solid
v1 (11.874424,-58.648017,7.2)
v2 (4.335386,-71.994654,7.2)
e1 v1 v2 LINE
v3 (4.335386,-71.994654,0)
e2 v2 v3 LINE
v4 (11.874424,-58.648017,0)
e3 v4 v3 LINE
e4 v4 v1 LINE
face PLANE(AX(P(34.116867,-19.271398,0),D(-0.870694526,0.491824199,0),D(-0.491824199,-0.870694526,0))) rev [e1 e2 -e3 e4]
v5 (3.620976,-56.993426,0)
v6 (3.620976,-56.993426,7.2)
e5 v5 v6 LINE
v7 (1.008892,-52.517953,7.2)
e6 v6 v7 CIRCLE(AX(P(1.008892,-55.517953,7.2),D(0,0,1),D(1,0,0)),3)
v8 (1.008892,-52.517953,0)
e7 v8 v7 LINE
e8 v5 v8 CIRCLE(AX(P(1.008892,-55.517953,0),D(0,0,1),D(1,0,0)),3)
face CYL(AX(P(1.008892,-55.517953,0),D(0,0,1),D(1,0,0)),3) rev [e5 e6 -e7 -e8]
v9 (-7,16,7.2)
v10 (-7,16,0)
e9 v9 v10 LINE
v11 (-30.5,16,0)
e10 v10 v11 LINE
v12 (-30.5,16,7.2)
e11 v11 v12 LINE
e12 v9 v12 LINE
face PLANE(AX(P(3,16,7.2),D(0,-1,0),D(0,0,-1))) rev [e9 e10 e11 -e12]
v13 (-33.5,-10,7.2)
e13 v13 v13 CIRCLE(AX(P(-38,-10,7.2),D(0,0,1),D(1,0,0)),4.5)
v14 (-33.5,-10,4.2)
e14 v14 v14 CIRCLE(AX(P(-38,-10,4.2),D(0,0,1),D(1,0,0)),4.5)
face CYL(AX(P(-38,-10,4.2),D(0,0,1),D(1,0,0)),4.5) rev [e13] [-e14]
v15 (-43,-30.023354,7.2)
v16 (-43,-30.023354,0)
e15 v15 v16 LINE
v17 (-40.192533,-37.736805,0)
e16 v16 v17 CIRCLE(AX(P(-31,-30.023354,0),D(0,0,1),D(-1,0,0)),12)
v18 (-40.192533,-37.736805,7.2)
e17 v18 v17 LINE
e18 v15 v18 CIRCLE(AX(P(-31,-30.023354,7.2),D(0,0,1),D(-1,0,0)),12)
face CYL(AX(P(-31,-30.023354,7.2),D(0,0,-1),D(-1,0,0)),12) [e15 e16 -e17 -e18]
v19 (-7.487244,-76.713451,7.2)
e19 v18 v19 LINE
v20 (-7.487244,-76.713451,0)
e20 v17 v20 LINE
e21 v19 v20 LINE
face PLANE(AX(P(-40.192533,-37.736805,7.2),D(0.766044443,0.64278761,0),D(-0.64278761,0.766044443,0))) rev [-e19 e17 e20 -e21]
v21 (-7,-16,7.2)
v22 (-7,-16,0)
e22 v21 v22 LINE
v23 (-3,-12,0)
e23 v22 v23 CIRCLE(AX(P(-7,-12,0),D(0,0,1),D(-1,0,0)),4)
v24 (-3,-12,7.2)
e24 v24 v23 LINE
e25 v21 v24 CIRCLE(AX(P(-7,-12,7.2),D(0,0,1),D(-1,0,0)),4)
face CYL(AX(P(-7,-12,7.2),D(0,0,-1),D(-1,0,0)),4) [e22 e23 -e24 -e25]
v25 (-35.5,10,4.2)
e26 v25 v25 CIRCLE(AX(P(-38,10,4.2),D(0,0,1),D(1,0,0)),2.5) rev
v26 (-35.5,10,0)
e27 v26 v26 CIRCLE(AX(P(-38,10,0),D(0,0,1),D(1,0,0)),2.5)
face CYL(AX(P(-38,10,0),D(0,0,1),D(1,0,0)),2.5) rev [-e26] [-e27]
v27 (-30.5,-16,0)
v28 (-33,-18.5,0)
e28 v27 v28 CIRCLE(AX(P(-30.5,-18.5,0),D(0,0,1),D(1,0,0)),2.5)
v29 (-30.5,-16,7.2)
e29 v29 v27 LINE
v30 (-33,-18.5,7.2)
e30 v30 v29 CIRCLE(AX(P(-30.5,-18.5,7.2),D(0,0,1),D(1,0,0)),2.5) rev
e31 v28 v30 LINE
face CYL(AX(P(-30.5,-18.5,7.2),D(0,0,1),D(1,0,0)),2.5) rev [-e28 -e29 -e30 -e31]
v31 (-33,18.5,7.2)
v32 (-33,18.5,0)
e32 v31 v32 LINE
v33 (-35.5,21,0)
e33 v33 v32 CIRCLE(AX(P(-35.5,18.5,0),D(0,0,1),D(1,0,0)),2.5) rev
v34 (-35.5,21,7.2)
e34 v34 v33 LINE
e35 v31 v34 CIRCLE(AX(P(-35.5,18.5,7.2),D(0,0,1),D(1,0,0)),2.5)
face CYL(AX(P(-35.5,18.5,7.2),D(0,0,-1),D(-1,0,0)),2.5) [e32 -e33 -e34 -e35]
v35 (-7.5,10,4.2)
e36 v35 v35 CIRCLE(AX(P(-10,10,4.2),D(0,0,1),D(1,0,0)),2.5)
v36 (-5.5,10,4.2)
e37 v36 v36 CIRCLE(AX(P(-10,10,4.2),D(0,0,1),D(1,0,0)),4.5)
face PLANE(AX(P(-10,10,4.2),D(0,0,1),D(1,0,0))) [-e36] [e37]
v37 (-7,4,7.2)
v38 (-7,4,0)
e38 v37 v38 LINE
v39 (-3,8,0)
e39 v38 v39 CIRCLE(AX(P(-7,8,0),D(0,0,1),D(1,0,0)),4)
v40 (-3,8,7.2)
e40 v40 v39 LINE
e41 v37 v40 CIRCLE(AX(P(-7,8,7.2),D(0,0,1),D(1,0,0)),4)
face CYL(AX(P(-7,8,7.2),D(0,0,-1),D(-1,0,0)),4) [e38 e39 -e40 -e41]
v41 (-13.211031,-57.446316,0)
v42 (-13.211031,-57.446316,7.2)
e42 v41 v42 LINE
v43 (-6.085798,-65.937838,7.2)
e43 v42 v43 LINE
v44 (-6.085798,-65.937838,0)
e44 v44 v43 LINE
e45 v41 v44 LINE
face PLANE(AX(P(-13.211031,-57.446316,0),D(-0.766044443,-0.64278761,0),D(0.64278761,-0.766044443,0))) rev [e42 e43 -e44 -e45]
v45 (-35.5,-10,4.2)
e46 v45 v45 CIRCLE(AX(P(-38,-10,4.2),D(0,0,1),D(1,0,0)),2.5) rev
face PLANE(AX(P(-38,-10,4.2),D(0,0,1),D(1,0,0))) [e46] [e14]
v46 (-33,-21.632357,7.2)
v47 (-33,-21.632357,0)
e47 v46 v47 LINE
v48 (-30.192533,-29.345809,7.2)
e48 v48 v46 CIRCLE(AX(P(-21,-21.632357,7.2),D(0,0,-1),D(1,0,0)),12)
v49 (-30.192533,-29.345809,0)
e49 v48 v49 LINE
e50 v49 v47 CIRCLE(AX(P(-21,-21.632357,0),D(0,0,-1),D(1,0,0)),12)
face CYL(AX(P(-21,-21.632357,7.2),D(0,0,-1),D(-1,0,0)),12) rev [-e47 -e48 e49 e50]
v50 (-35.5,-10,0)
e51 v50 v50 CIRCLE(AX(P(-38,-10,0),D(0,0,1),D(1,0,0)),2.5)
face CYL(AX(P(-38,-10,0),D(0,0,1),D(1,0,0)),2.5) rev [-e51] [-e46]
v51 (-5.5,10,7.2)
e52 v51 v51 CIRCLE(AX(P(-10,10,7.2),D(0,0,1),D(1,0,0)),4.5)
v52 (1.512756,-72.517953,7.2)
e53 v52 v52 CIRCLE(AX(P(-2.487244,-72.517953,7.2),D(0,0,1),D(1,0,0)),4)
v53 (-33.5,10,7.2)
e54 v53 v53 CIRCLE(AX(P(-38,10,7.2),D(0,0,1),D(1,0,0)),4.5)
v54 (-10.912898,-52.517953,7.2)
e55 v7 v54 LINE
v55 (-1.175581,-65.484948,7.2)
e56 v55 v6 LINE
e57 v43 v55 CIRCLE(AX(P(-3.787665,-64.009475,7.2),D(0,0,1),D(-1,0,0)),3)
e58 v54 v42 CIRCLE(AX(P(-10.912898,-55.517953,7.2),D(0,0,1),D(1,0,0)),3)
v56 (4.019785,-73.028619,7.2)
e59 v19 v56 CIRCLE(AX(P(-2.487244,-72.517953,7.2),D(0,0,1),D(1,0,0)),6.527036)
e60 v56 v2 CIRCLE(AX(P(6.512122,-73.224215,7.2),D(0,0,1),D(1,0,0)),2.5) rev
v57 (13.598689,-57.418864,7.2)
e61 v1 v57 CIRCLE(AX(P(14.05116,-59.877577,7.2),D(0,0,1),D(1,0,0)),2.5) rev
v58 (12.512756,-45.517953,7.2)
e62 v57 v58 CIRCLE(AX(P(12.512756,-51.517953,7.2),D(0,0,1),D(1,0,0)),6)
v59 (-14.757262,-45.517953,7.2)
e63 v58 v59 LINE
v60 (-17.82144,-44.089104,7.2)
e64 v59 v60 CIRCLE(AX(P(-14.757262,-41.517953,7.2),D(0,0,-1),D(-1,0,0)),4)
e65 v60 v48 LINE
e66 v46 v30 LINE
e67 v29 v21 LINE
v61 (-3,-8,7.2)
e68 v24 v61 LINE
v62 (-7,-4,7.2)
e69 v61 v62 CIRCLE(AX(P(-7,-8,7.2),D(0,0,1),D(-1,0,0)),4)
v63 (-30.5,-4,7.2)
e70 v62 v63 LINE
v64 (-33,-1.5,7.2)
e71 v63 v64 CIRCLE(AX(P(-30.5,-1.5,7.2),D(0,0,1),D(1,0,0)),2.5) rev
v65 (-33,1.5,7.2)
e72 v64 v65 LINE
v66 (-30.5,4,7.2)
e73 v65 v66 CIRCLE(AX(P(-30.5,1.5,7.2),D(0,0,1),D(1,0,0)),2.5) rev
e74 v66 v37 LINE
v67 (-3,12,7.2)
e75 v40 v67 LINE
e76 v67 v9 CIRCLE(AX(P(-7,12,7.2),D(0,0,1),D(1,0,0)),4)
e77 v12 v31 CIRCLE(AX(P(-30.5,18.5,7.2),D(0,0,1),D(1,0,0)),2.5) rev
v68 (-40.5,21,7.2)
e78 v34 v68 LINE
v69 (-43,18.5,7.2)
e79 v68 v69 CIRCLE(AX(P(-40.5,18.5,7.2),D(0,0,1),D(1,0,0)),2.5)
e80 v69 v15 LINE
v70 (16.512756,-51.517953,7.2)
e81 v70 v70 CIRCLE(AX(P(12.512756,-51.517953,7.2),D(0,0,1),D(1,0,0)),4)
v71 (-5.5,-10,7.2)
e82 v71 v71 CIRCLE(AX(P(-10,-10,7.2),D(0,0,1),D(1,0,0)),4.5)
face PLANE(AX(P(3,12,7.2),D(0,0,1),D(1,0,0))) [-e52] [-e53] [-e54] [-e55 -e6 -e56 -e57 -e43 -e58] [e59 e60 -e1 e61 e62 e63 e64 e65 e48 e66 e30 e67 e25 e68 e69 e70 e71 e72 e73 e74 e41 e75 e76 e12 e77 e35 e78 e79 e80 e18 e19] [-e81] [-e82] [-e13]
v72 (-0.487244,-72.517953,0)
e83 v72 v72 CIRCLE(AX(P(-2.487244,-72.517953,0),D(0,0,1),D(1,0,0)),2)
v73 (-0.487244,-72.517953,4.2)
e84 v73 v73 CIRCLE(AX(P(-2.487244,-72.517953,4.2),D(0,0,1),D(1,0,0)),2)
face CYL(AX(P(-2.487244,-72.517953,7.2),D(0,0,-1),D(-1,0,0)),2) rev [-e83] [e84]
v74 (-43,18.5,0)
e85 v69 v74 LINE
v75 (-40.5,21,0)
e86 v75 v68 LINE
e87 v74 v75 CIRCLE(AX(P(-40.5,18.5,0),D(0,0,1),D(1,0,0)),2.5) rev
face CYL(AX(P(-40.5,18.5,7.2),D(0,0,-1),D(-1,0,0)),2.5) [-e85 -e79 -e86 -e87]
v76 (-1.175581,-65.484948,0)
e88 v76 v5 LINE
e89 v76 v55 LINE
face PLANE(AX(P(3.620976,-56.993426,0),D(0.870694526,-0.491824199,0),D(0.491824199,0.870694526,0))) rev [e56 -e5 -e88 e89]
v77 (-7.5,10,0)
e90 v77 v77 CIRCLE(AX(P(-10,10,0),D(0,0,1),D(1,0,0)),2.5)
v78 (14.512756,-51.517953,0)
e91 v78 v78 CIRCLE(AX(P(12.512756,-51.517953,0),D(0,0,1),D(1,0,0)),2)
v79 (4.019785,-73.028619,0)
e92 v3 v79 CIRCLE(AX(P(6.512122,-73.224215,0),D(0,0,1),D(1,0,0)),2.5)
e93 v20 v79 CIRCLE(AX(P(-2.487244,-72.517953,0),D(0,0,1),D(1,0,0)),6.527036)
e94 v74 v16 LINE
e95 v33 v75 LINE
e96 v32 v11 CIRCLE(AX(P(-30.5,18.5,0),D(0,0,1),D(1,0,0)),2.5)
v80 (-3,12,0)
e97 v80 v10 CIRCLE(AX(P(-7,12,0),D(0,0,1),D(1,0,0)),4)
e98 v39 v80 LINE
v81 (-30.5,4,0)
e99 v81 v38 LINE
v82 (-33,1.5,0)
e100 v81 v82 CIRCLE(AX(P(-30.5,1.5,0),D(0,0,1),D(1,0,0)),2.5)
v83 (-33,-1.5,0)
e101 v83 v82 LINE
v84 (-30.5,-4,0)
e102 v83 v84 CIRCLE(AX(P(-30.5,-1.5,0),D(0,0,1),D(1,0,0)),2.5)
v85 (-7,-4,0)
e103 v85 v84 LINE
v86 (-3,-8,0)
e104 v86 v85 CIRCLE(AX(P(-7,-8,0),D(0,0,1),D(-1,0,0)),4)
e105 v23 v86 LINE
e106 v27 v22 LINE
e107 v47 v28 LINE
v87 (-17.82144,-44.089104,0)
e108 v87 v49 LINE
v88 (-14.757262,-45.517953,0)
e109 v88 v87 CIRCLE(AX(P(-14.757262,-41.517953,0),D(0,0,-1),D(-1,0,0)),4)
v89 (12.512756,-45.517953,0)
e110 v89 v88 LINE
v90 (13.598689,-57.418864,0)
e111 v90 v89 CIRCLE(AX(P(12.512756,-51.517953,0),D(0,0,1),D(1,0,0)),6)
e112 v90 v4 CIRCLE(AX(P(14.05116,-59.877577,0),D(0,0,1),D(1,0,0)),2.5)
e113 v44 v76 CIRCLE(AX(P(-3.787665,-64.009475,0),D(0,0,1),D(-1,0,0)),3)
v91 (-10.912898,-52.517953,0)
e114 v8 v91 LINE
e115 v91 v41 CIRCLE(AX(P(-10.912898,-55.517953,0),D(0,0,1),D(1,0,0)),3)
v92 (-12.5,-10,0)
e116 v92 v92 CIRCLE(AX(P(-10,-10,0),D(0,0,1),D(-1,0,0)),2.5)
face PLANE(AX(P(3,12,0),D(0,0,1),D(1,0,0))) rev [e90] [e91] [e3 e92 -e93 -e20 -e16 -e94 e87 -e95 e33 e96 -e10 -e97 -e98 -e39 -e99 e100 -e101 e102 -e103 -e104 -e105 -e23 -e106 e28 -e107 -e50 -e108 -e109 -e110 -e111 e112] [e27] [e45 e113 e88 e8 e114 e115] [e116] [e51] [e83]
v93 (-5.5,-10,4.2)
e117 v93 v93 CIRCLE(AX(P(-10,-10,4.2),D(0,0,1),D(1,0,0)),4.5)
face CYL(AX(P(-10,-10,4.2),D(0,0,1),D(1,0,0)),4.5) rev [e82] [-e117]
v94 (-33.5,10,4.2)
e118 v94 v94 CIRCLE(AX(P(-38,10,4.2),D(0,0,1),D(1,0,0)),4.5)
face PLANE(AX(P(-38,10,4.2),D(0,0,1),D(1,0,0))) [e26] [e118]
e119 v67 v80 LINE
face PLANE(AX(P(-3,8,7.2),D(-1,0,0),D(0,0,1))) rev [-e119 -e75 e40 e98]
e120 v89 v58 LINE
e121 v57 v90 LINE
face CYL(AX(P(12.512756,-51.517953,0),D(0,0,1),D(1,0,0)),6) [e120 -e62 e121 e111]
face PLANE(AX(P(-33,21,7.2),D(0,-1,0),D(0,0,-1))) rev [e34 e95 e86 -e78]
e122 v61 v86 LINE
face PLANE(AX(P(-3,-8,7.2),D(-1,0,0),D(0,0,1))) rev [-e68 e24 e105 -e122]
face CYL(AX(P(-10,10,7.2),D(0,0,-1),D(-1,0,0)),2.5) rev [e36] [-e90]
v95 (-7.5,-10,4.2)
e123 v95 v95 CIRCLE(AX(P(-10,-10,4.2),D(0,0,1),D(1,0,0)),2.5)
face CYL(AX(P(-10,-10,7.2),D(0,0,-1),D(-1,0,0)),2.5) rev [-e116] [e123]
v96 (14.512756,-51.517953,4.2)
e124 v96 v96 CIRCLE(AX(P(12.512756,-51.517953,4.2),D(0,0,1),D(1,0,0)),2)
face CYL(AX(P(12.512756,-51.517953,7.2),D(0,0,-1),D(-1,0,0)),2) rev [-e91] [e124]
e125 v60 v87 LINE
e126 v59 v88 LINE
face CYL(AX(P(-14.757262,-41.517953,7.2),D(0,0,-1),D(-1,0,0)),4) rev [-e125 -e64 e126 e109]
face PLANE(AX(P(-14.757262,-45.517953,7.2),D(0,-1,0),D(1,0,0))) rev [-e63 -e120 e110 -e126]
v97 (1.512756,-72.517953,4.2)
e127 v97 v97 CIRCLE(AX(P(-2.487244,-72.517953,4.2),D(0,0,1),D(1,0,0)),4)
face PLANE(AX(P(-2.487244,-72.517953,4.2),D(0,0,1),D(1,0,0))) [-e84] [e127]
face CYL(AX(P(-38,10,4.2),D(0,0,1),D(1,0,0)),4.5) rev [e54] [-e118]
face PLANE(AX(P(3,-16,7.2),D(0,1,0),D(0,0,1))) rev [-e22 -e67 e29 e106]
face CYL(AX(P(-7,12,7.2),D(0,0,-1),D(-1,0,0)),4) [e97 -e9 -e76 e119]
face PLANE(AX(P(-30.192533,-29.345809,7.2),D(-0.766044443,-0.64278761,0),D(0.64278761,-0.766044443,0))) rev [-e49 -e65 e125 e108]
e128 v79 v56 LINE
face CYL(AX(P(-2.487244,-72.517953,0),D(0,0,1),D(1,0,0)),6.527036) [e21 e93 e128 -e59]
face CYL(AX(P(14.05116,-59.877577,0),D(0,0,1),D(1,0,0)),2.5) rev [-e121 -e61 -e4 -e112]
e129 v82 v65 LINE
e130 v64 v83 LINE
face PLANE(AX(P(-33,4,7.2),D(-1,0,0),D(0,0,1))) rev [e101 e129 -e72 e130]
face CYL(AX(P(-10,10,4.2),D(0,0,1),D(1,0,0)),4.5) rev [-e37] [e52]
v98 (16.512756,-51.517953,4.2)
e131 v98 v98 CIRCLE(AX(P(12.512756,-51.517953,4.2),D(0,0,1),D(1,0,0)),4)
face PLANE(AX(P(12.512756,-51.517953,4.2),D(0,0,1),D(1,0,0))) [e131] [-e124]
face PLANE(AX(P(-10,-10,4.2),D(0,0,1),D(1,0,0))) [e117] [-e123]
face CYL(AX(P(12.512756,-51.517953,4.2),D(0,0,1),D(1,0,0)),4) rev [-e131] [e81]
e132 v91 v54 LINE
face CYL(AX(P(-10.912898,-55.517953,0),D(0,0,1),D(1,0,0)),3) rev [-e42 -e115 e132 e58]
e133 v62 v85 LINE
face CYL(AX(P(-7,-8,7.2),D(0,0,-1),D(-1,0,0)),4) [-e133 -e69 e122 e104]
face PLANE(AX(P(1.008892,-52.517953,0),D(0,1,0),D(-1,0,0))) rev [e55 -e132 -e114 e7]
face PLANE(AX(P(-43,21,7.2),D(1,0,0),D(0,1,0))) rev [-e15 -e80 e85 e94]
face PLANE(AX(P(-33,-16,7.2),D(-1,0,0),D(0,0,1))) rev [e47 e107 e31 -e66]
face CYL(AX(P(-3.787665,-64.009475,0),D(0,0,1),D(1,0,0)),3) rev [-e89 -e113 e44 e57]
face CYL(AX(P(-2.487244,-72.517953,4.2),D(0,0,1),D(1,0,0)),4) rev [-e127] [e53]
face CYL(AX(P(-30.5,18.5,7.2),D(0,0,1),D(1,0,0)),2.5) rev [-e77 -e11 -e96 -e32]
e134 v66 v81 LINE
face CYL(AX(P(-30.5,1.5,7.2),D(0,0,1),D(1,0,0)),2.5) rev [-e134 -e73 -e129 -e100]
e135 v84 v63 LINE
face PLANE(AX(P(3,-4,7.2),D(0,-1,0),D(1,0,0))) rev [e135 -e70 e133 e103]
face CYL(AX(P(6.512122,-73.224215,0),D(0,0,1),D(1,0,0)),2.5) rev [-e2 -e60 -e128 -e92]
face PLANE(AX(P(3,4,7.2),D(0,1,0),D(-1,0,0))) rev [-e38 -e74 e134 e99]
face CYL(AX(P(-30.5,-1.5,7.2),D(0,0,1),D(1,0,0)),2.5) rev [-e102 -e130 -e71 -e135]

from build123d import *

# Parameters (mm, degrees)
SKETCH2_R            = 2.5
SKETCH2_R_2          = 2
BOSS_EXTRUDE1_DEPTH  = 7.2
MOVE_FACE1_OUTLINE_R = 2.5
MOVE_FACE1_DEPTH     = 7.2
CUT_EXTRUDE2_DEPTH   = 92.988260121
FILLET1_R            = 2.5
SKETCH5_R            = 2.5
CUT_EXTRUDE3_DEPTH   = 91.271536943
CUT_EXTRUDE4_DEPTH   = 91.271536943
SKETCH8_R            = 4.5
SKETCH8_R_2          = 4
CUT_EXTRUDE5_DEPTH   = 3


# Read off the part's stored shape, not the designer's step: Move Face1
with BuildPart() as part:
    # Sketch2 → Boss-Extrude1 (new body)
    with BuildSketch(Plane.XY):
        with BuildLine():
            Line((3, 4), (-33, 4))
            Line((-33, 4), (-33, -4))
            Line((-33, -4), (3, -4))
            ThreePointArc((3, -4), (5.828427125, -5.171572875), (7, -8))
            Line((7, -8), (7, -12))
            ThreePointArc((7, -12), (5.828427125, -14.828427125), (3, -16))
            Line((3, -16), (-33, -16))
            Line((-33, -16), (-33, -21.632357189))
            ThreePointArc((-33, -21.632357189), (-32.276311449, -25.736598909), (-30.192533317, -29.345808505))
            Line((-30.192533317, -29.345808505), (-17.821439842, -44.089103599))
            ThreePointArc((-17.821439842, -44.089103599), (-16.447735116, -45.143184308), (-14.757262069, -45.51795316))
            Line((-14.757262069, -45.51795316), (14.512756385, -45.51795316))
            ThreePointArc((14.512756385, -45.51795316), (17.34118351, -46.689526036), (18.512756385, -49.51795316))
            Line((18.512756385, -49.51795316), (18.512756385, -81))
            Line((18.512756385, -81), (8.861465874, -81))
            Line((8.861465874, -81), (1.705289702, -81))
            ThreePointArc((1.705289702, -81), (-3.366129439, -79.875693444), (-7.487243615, -76.713451316))
            Line((-7.487243615, -76.713451316), (-40.192533317, -37.736804817))
            ThreePointArc((-40.192533317, -37.736804817), (-42.276311449, -34.12759522), (-43, -30.023353501))
            Line((-43, -30.023353501), (-43, 21))
            Line((-43, 21), (-33, 21))
            Line((-33, 21), (-33, 16))
            Line((-33, 16), (3, 16))
            ThreePointArc((3, 16), (5.828427125, 14.828427125), (7, 12))
            Line((7, 12), (7, 8))
            ThreePointArc((7, 8), (5.828427125, 5.171572875), (3, 4))
        make_face()
        with Locations((0, 10)):
            Circle(SKETCH2_R, mode=Mode.SUBTRACT)
        with Locations(Location((0, -10, 0), (0, 0, 180))):
            Circle(SKETCH2_R, mode=Mode.SUBTRACT)
        with Locations((12.512756385, -51.51795316)):
            Circle(SKETCH2_R_2, mode=Mode.SUBTRACT)
        with Locations((-2.487243615, -72.51795316)):
            Circle(SKETCH2_R_2, mode=Mode.SUBTRACT)
    extrude(amount=BOSS_EXTRUDE1_DEPTH)

    # Move Face1 outline → Move Face1 (cut)
    # profile 1 of 4: a face of its own
    with BuildSketch(Plane.XY):
        with BuildLine():
            Line((-3, -8), (-3, -12))
            ThreePointArc((-3, -12), (-4.171572875, -14.828427125), (-7, -16))
            Line((-7, -16), (3, -16))
            ThreePointArc((3, -16), (5.828427125, -14.828427125), (7, -12))
            Line((7, -12), (7, -8))
            ThreePointArc((7, -8), (5.828427125, -5.171572875), (3, -4))
            Line((3, -4), (-7, -4))
            ThreePointArc((-7, -4), (-4.171572875, -5.171572875), (-3, -8))
        make_face()
        with Locations((0, -10)):
            Circle(MOVE_FACE1_OUTLINE_R, mode=Mode.SUBTRACT)
    # profile 2 of 4: a face of its own
    with BuildSketch(Plane.XY):
        with BuildLine():
            ThreePointArc((-7, 16), (-4.171572875, 14.828427125), (-3, 12))
            Line((-3, 12), (-3, 8))
            ThreePointArc((-3, 8), (-4.171572875, 5.171572875), (-7, 4))
            Line((-7, 4), (3, 4))
            ThreePointArc((3, 4), (5.828427125, 5.171572875), (7, 8))
            Line((7, 8), (7, 12))
            ThreePointArc((7, 12), (5.828427125, 14.828427125), (3, 16))
            Line((3, 16), (-7, 16))
        make_face()
        with Locations((0, 10)):
            Circle(MOVE_FACE1_OUTLINE_R, mode=Mode.SUBTRACT)
    # profile 3 of 4: a face of its own
    with BuildSketch(Plane.XY):
        with Locations((-10, 10)):
            Circle(MOVE_FACE1_OUTLINE_R)
    # profile 4 of 4: a face of its own
    with BuildSketch(Plane.XY):
        with Locations((-10, -10)):
            Circle(MOVE_FACE1_OUTLINE_R)
    extrude(amount=MOVE_FACE1_DEPTH, mode=Mode.SUBTRACT)

    # Sketch4 → Cut-Extrude2 (cut, through all)
    with BuildSketch(Plane.XY.offset(7.2)):
        with BuildLine():
            Line((12.512756385, -57.51795316), (4.039792831, -72.51795316))
            ThreePointArc((4.039792831, -72.51795316), (-0.254865674, -78.651361145), (-7.487243615, -76.713451316))
            Line((-7.487243615, -76.713451316), (-9.608649797, -88.557738574))
            Line((-9.608649797, -88.557738574), (26.411143911, -81.246796091))
            Line((26.411143911, -81.246796091), (26.411143911, -45.51795316))
            Line((26.411143911, -45.51795316), (12.512756385, -45.51795316))
            ThreePointArc((12.512756385, -45.51795316), (18.512756385, -51.51795316), (12.512756385, -57.51795316))
        make_face()
    extrude(amount=-CUT_EXTRUDE2_DEPTH, mode=Mode.SUBTRACT)

    # Fillet1
    fillet1_edges = [part.edges().sort_by_distance(p)[0] for p in [
        (12.512756385, -57.51795316, 3.6),
        (4.039792831, -72.51795316, 3.6),
        (-33, 16, 3.6),
        (-33, 4, 3.6),
        (-33, -4, 3.6),
        (-33, -16, 3.6),
        (-43, 21, 3.6),
        (-33, 21, 3.6),
    ]]
    fillet(fillet1_edges, radius=FILLET1_R - 0.0001)  # a hair under: the kernel refuses the full size

    # Sketch5 → Cut-Extrude3 (cut, through all)
    with BuildSketch(Plane.XY.offset(7.2)):
        with Locations((-38, 10)):
            Circle(SKETCH5_R)
        with Locations((-38, -10)):
            Circle(SKETCH5_R)
    extrude(amount=-CUT_EXTRUDE3_DEPTH, mode=Mode.SUBTRACT)

    # Sketch6 → Cut-Extrude4 (cut, through all)
    with BuildSketch(Plane.XY.offset(7.2)):
        with BuildLine():
            Line((1.008892165, -52.51795316), (-10.912898118, -52.51795316))
            ThreePointArc((-10.912898118, -52.51795316), (-13.631821479, -54.250098375), (-13.211031447, -57.446315989))
            Line((-13.211031447, -57.446315989), (-6.085798343, -65.937838139))
            ThreePointArc((-6.085798343, -65.937838139), (-3.512131749, -66.996795417), (-1.175581436, -65.484947907))
            Line((-1.175581436, -65.484947907), (3.620975743, -56.993425757))
            ThreePointArc((3.620975743, -56.993425757), (3.599878251, -54.005739186), (1.008892165, -52.51795316))
        make_face()
    extrude(amount=-CUT_EXTRUDE4_DEPTH, mode=Mode.SUBTRACT)

    # Sketch8 → Cut-Extrude5 (cut)
    with BuildSketch(Plane.XY.offset(7.2)):
        with Locations((-38, 10)):
            Circle(SKETCH8_R)
        with Locations((-10, 10)):
            Circle(SKETCH8_R)
        with Locations((-38, -10)):
            Circle(SKETCH8_R)
        with Locations((-10, -10)):
            Circle(SKETCH8_R)
        with Locations((12.512756385, -51.51795316)):
            Circle(SKETCH8_R_2)
        with Locations((-2.487243615, -72.51795316)):
            Circle(SKETCH8_R_2)
    extrude(amount=-CUT_EXTRUDE5_DEPTH, mode=Mode.SUBTRACT)


solid = part.part
